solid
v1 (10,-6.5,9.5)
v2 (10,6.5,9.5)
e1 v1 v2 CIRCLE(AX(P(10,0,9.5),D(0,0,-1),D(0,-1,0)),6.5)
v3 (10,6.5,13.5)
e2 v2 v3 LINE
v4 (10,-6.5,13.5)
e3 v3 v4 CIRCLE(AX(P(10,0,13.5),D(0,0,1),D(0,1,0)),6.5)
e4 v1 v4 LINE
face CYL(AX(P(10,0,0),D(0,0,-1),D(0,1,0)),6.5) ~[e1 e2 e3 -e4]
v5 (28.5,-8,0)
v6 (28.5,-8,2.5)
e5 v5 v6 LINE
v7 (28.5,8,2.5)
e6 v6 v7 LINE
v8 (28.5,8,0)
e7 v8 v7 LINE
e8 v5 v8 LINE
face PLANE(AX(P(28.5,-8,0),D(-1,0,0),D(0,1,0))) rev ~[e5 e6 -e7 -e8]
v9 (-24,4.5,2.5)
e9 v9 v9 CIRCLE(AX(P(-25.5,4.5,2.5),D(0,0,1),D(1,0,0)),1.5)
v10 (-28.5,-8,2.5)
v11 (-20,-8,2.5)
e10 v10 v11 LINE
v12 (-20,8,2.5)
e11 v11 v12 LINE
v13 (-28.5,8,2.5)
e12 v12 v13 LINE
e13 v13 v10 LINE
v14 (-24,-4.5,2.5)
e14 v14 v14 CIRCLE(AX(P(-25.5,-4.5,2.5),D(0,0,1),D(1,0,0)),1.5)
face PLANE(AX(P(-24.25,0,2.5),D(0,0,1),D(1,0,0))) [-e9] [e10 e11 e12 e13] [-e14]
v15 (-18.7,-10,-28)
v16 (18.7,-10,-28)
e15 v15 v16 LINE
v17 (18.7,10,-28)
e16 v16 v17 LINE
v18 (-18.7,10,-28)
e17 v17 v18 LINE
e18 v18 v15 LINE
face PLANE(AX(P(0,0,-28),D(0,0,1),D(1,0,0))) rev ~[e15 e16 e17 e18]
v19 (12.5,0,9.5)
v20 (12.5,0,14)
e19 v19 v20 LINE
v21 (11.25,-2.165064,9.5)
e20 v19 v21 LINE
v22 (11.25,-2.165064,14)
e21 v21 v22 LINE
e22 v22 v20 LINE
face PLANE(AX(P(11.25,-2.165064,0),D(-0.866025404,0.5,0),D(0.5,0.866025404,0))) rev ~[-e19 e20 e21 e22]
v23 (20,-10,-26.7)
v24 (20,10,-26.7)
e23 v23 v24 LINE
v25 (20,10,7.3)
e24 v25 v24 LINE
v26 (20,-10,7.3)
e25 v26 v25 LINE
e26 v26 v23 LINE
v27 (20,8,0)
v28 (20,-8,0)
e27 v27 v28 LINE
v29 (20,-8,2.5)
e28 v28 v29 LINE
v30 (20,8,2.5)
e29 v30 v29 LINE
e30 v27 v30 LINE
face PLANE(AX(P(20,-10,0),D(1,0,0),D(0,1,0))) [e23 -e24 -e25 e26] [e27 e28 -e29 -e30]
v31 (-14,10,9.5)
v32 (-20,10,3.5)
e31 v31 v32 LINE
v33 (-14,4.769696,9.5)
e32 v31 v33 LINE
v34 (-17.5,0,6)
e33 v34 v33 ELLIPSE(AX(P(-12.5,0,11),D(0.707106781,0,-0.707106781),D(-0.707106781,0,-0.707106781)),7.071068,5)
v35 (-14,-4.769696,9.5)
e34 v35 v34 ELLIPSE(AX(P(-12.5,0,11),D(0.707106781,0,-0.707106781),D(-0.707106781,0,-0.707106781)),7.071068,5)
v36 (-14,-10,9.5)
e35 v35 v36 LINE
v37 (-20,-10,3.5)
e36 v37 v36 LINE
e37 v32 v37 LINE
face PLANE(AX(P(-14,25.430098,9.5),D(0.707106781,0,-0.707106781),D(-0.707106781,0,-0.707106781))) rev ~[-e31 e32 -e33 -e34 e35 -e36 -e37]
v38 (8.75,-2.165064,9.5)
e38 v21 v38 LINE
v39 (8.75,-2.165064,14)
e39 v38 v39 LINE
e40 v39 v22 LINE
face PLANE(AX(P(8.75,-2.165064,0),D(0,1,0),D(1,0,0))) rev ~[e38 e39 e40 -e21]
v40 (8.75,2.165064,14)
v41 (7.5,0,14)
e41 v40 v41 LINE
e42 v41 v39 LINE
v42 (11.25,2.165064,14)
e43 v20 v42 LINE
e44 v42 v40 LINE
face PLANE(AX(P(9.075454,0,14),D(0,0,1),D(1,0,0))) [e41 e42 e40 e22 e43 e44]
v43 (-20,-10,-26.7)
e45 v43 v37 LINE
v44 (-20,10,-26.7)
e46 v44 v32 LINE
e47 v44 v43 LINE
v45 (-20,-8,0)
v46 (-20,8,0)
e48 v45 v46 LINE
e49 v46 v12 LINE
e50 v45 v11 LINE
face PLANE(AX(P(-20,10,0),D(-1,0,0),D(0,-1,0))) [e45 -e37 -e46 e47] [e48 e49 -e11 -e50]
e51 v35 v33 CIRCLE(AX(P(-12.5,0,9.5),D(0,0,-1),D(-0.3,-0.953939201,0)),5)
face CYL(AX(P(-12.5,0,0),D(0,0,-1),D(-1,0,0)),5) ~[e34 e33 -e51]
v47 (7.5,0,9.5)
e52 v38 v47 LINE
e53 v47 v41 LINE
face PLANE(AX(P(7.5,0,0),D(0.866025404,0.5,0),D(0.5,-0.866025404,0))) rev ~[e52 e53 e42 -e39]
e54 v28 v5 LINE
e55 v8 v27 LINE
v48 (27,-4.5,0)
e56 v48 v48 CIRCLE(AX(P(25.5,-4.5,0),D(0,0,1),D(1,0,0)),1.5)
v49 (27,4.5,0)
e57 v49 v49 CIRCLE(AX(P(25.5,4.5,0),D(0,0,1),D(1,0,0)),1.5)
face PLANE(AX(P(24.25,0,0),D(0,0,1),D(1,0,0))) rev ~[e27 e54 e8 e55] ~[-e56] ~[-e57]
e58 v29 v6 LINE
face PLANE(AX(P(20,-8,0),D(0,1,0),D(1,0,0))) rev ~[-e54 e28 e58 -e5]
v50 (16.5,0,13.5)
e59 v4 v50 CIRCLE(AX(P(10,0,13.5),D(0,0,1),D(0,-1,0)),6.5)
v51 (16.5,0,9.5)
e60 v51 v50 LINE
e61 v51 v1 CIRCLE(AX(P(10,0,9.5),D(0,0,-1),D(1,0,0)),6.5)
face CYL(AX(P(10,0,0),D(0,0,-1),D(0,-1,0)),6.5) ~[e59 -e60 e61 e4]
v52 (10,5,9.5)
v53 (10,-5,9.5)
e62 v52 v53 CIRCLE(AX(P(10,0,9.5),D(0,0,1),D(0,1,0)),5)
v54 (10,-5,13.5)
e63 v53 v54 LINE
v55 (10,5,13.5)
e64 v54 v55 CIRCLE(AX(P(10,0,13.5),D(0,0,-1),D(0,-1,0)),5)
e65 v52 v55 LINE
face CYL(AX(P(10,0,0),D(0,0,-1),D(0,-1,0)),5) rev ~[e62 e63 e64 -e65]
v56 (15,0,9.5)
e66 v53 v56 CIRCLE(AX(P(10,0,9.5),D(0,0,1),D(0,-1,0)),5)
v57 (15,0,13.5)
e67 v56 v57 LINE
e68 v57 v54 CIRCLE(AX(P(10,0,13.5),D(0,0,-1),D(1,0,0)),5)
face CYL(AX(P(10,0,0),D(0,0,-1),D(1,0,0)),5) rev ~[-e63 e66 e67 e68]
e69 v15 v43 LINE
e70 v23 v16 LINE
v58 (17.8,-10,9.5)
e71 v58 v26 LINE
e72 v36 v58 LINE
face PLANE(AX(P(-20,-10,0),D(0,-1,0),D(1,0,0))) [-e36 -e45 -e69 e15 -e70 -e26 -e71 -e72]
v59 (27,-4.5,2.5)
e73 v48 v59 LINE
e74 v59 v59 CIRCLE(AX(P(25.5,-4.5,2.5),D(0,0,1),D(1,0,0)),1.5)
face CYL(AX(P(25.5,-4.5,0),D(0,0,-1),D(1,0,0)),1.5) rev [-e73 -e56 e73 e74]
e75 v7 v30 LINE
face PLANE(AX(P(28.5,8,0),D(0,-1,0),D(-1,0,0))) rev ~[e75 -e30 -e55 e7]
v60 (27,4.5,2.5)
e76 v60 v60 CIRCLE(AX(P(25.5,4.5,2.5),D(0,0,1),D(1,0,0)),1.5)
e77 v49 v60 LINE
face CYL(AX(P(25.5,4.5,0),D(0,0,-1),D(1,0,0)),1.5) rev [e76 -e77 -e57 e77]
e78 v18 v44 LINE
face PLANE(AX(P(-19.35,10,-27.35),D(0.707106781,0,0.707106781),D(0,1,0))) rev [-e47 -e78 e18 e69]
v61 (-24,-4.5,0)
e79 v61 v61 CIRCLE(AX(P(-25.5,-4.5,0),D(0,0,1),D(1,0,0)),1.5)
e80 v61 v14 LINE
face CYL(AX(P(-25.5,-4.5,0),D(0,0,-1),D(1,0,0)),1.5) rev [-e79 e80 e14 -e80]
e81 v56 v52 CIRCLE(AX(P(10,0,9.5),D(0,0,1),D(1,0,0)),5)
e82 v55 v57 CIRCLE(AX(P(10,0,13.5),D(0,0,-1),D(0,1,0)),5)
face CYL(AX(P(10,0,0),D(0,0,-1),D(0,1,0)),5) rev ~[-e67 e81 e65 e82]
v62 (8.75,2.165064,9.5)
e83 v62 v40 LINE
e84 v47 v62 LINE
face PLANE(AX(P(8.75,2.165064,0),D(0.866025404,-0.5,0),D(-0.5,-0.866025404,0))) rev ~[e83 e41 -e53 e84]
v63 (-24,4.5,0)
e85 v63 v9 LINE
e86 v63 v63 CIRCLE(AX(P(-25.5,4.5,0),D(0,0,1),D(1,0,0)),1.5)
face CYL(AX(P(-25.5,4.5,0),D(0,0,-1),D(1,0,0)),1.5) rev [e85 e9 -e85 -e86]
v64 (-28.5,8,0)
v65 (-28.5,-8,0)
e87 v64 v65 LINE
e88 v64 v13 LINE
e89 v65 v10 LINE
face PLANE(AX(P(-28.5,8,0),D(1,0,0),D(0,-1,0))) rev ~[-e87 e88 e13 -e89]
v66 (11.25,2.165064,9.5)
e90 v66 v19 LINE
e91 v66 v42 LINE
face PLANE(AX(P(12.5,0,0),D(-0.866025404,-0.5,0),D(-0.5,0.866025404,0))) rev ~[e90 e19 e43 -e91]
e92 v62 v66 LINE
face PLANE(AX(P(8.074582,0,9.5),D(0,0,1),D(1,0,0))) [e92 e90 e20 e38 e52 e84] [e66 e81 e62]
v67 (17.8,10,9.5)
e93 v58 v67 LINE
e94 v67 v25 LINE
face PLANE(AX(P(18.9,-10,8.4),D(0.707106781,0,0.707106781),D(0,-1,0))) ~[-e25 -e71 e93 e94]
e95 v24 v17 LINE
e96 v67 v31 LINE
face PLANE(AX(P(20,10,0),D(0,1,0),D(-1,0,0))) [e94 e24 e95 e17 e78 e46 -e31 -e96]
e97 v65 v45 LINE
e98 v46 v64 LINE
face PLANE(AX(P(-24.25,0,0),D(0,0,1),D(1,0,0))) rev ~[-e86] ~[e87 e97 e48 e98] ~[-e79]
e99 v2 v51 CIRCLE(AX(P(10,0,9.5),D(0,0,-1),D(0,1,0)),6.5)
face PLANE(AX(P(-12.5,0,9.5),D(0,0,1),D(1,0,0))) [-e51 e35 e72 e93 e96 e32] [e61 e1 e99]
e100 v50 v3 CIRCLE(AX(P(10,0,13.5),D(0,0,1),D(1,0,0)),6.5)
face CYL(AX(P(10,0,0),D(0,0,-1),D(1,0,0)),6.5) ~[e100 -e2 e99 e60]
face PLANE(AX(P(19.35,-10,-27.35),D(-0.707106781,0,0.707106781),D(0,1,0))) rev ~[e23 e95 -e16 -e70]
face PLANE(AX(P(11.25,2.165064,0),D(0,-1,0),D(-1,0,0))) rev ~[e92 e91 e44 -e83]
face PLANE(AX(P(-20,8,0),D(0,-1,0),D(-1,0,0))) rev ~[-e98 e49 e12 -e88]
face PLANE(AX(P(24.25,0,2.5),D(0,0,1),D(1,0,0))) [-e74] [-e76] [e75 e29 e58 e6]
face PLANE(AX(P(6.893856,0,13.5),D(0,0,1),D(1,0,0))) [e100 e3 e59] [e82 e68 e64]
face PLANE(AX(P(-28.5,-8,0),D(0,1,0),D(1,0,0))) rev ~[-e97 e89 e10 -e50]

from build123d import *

# Parameters (mm, degrees)
F1_DEPTH    = 14
F2_DEPTH    = 13.5
F0_R        = 9.5
F3_DEPTH    = 9.5
F4_DEPTH    = 9.5
F5_DEPTH    = 28
F0_R_2      = 1.5
F6_DEPTH    = 2.5
F7_SIZE     = 2.2
F8_T1_DEPTH = 50.8601958556
F9_DEPTH    = 9.5
F10_SIZE    = 1.3


# Not quite as in the source:
# - a fillet or chamfer that OpenCascade refuses, or shapes differently, is made with other operations: its cross-section is extruded or revolved along the edge and cut away or added


with BuildPart() as f1:
    # F0 (on Top) → F1 (new body)
    with BuildSketch(Plane.XY):
        Polygon((10, 2.1650635095), (8.75, 2.1650635095), (7.5, 0), (8.75, -2.1650635095), (10, -2.1650635095), (10, 0), align=None)
        Polygon((11.25, 2.1650635095), (10, 2.1650635095), (10, 0), (10, -2.1650635095), (11.25, -2.1650635095), (12.5, 0), align=None)
    extrude(amount=F1_DEPTH)



with BuildPart() as f2:
    # F0 (on Top) → F2 (new body)
    with BuildSketch(Plane.XY):
        with BuildLine():
            ThreePointArc((10, -5), (5, 0), (10, 5))
            Line((10, 5), (10, 6.5))
            ThreePointArc((10, 6.5), (3.5, 0), (10, -6.5))
            Line((10, -6.5), (10, -5))
        make_face()
        with BuildLine():
            Line((10, 6.5), (10, 5))
            ThreePointArc((10, 5), (13.5355339059, 3.5355339059), (15, 0))
            ThreePointArc((15, 0), (13.5355339059, -3.5355339059), (10, -5))
            Line((10, -5), (10, -6.5))
            ThreePointArc((10, -6.5), (14.5961940777, -4.5961940777), (16.5, 0))
            ThreePointArc((16.5, 0), (14.5961940777, 4.5961940777), (10, 6.5))
        make_face()
    extrude(amount=F2_DEPTH)


with BuildPart() as f1_1:
    add(f1.part)

    add(f2.part)  # F3 merges F2
    # F0 (on Top) → F3 (join)
    with BuildSketch(Plane.XY):
        with Locations((10, 0)):
            Circle(F0_R)
        with BuildLine():
            ThreePointArc((10, -6.5), (3.5, 0), (10, 6.5))
            ThreePointArc((10, 6.5), (14.5961940777, 4.5961940777), (16.5, 0))
            ThreePointArc((16.5, 0), (14.5961940777, -4.5961940777), (10, -6.5))
        make_face(mode=Mode.SUBTRACT)
        with BuildLine():
            Line((7.5, 0), (8.75, 2.1650635095))
            Line((8.75, 2.1650635095), (10, 2.1650635095))
            Line((10, 2.1650635095), (10, 5))
            ThreePointArc((10, 5), (5, 0), (10, -5))
            Line((10, -5), (10, -2.1650635095))
            Line((10, -2.1650635095), (8.75, -2.1650635095))
            Line((8.75, -2.1650635095), (7.5, 0))
        make_face()
        with BuildLine():
            Line((10, 5), (10, 2.1650635095))
            Line((10, 2.1650635095), (11.25, 2.1650635095))
            Line((11.25, 2.1650635095), (12.5, 0))
            Line((12.5, 0), (11.25, -2.1650635095))
            Line((11.25, -2.1650635095), (10, -2.1650635095))
            Line((10, -2.1650635095), (10, -5))
            ThreePointArc((10, -5), (13.5355339059, -3.5355339059), (15, 0))
            ThreePointArc((15, 0), (13.5355339059, 3.5355339059), (10, 5))
        make_face()
    extrude(amount=F3_DEPTH)

    # F0 (on Top) → F4 (join)
    with BuildSketch(Plane.XY):
        Polygon((20, 10), (-20, 10), (-20, 8), (-20, 0), (-20, -8), (-20, -10), (20, -10), (20, -8), (20, 0), (20, 8), align=None)
        with BuildLine():
            ThreePointArc((-7.5, 0), (-12.5, -5), (-17.5, 0))
            ThreePointArc((-17.5, 0), (-12.5, 5), (-7.5, 0))
        make_face(mode=Mode.SUBTRACT)
        with Locations((10, 0)):
            Circle(F0_R, mode=Mode.SUBTRACT)
        with Locations((10, 0)):
            Circle(F0_R)
        with BuildLine():
            ThreePointArc((10, -6.5), (3.5, 0), (10, 6.5))
            ThreePointArc((10, 6.5), (14.5961940777, 4.5961940777), (16.5, 0))
            ThreePointArc((16.5, 0), (14.5961940777, -4.5961940777), (10, -6.5))
        make_face(mode=Mode.SUBTRACT)
    extrude(amount=F4_DEPTH)

    # F0 (on Top) → F5 (join)
    with BuildSketch(Plane.XY):
        Polygon((20, 10), (-20, 10), (-20, 8), (-20, 0), (-20, -8), (-20, -10), (20, -10), (20, -8), (20, 0), (20, 8), align=None)
        with BuildLine():
            ThreePointArc((-7.5, 0), (-12.5, -5), (-17.5, 0))
            ThreePointArc((-17.5, 0), (-12.5, 5), (-7.5, 0))
        make_face(mode=Mode.SUBTRACT)
        with Locations((10, 0)):
            Circle(F0_R, mode=Mode.SUBTRACT)
        with Locations((10, 0)):
            Circle(F0_R)
        with BuildLine():
            ThreePointArc((10, -6.5), (3.5, 0), (10, 6.5))
            ThreePointArc((10, 6.5), (14.5961940777, 4.5961940777), (16.5, 0))
            ThreePointArc((16.5, 0), (14.5961940777, -4.5961940777), (10, -6.5))
        make_face(mode=Mode.SUBTRACT)
        Polygon((10, 2.1650635095), (8.75, 2.1650635095), (7.5, 0), (8.75, -2.1650635095), (10, -2.1650635095), (10, 0), align=None)
        Polygon((11.25, 2.1650635095), (10, 2.1650635095), (10, 0), (10, -2.1650635095), (11.25, -2.1650635095), (12.5, 0), align=None)
        with BuildLine():
            Line((7.5, 0), (8.75, 2.1650635095))
            Line((8.75, 2.1650635095), (10, 2.1650635095))
            Line((10, 2.1650635095), (10, 5))
            ThreePointArc((10, 5), (5, 0), (10, -5))
            Line((10, -5), (10, -2.1650635095))
            Line((10, -2.1650635095), (8.75, -2.1650635095))
            Line((8.75, -2.1650635095), (7.5, 0))
        make_face()
        with BuildLine():
            Line((10, 5), (10, 2.1650635095))
            Line((10, 2.1650635095), (11.25, 2.1650635095))
            Line((11.25, 2.1650635095), (12.5, 0))
            Line((12.5, 0), (11.25, -2.1650635095))
            Line((11.25, -2.1650635095), (10, -2.1650635095))
            Line((10, -2.1650635095), (10, -5))
            ThreePointArc((10, -5), (13.5355339059, -3.5355339059), (15, 0))
            ThreePointArc((15, 0), (13.5355339059, 3.5355339059), (10, 5))
        make_face()
        with BuildLine():
            ThreePointArc((10, -5), (5, 0), (10, 5))
            Line((10, 5), (10, 6.5))
            ThreePointArc((10, 6.5), (3.5, 0), (10, -6.5))
            Line((10, -6.5), (10, -5))
        make_face()
        with BuildLine():
            Line((10, 6.5), (10, 5))
            ThreePointArc((10, 5), (13.5355339059, 3.5355339059), (15, 0))
            ThreePointArc((15, 0), (13.5355339059, -3.5355339059), (10, -5))
            Line((10, -5), (10, -6.5))
            ThreePointArc((10, -6.5), (14.5961940777, -4.5961940777), (16.5, 0))
            ThreePointArc((16.5, 0), (14.5961940777, 4.5961940777), (10, 6.5))
        make_face()
        with BuildLine():
            ThreePointArc((-7.5, 0), (-12.5, 5), (-17.5, 0))
            ThreePointArc((-17.5, 0), (-12.5, -5), (-7.5, 0))
        make_face()
    extrude(amount=-F5_DEPTH)

    # F0 (on Top) → F6 (join)
    with BuildSketch(Plane.XY):
        Polygon((28.5, 8), (20, 8), (20, 0), (20, -8), (28.5, -8), align=None)
        with Locations((25.5, -4.5)):
            Circle(F0_R_2, mode=Mode.SUBTRACT)
        with Locations((25.5, 4.5)):
            Circle(F0_R_2, mode=Mode.SUBTRACT)
        Polygon((-20, 0), (-20, 8), (-28.5, 8), (-28.5, -8), (-20, -8), align=None)
        with Locations((-25.5, -4.5)):
            Circle(F0_R_2, mode=Mode.SUBTRACT)
        with Locations((-25.5, 4.5)):
            Circle(F0_R_2, mode=Mode.SUBTRACT)
    extrude(amount=F6_DEPTH)

    # F7
    f7_edges = [f1_1.edges().sort_by_distance(p)[0] for p in [
        (20, 0, 9.5),
    ]]
    chamfer(f7_edges, length=F7_SIZE)

    # F8: chamfer of 6 on 1 edges, made by hand

    # F8_s2 → F8_t1 (cut)
    with BuildSketch(Plane.XZ.offset(-25.4300979278)):
        Polygon((-14, 9.5), (-20, 3.5), (-20, 9.5), align=None)
    extrude(amount=F8_T1_DEPTH, mode=Mode.SUBTRACT)

    # F0 (on Top) → F9 (join)
    with BuildSketch(Plane.XY):
        with BuildLine():
            ThreePointArc((-7.5, 0), (-12.5, 5), (-17.5, 0))
            ThreePointArc((-17.5, 0), (-12.5, -5), (-7.5, 0))
        make_face()
    extrude(amount=F9_DEPTH)

    # F10
    f10_edges = [f1_1.edges().sort_by_distance(p)[0] for p in [
        (20, 0, -28),
        (-20, 0, -28),
    ]]
    chamfer(f10_edges, length=F10_SIZE)


solid = f1_1.part
